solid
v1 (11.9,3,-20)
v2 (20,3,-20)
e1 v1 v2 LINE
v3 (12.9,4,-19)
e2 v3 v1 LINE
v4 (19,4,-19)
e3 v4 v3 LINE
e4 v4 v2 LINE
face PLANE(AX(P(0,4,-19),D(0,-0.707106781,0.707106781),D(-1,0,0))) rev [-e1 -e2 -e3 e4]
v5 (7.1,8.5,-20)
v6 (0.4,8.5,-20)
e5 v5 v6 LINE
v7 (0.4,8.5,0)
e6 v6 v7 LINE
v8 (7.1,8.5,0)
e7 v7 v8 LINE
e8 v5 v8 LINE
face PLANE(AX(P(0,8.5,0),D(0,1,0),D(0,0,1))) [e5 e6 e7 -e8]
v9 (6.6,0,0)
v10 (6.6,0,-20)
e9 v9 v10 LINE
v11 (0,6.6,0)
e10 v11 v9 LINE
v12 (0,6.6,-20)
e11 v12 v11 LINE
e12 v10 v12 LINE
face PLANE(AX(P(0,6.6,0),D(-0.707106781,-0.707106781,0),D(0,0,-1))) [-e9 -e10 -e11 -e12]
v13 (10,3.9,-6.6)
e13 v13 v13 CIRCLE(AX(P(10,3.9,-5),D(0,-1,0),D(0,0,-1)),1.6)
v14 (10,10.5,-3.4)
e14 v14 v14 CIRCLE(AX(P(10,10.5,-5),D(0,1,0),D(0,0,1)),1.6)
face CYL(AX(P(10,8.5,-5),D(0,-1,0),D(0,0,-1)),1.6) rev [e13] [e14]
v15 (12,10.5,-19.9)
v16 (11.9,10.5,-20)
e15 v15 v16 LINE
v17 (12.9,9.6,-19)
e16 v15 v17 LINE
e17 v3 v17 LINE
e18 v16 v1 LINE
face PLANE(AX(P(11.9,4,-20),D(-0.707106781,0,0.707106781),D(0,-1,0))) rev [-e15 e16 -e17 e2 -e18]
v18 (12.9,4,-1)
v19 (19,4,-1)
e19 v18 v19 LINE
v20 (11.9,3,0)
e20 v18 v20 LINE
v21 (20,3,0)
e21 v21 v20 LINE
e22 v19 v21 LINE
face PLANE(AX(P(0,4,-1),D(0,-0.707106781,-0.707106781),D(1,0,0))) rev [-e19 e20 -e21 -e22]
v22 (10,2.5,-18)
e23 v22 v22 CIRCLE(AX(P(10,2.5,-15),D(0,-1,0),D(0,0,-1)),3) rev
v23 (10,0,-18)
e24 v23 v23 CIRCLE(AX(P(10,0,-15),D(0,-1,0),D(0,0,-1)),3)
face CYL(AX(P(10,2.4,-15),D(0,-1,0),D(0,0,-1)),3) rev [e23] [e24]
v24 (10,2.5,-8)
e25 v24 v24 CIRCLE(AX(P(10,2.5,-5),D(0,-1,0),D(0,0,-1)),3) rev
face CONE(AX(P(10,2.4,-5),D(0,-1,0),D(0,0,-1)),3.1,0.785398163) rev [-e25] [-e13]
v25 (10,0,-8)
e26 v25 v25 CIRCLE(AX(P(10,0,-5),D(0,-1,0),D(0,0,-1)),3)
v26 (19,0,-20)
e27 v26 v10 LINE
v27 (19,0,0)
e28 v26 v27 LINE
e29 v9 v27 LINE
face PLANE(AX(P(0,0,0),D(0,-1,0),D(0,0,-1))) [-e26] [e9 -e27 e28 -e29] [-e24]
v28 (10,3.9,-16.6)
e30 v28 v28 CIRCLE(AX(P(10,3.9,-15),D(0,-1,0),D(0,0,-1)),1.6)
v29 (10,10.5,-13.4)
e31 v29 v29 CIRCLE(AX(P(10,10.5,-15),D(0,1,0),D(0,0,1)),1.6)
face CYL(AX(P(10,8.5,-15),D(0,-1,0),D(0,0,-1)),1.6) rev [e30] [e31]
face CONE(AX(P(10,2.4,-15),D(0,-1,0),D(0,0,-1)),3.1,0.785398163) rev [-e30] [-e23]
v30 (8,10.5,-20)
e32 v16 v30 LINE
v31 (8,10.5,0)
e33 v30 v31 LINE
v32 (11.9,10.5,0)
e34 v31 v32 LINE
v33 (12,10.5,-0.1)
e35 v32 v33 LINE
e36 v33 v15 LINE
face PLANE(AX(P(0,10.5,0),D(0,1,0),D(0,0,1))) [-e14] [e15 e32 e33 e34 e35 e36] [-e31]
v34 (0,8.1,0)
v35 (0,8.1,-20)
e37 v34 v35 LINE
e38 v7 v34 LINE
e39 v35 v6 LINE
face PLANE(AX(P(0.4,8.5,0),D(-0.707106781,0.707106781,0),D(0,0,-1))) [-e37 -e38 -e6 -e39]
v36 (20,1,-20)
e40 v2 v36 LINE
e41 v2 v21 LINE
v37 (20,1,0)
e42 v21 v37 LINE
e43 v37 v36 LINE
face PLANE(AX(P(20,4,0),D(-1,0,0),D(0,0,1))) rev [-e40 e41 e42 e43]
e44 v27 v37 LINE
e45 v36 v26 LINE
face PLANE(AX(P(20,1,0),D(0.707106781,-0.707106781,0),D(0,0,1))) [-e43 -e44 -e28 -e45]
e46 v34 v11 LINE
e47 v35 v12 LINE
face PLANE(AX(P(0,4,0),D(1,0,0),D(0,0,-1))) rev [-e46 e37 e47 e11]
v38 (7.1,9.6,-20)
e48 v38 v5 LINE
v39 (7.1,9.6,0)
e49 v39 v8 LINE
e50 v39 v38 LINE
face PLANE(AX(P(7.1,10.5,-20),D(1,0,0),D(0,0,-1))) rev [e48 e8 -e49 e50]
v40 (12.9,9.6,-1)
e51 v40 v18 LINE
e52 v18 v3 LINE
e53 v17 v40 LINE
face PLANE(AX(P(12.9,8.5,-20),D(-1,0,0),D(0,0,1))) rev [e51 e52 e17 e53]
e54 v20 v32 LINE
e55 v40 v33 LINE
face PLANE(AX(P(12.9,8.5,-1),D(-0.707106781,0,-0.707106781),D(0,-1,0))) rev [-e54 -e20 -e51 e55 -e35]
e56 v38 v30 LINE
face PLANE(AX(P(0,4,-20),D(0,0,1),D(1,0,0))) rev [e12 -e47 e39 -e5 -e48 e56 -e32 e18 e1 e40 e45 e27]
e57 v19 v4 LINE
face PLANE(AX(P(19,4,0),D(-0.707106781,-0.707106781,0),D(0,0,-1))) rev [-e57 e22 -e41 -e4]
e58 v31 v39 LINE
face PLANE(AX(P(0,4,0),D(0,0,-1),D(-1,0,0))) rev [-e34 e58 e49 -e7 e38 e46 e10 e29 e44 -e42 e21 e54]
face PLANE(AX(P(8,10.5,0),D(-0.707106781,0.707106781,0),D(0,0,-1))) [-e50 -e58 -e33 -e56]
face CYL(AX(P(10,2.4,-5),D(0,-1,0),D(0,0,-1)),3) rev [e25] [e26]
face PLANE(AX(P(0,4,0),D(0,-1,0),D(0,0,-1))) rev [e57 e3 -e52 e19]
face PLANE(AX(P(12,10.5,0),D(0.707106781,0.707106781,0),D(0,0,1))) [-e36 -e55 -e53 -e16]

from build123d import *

# Parameters (mm, degrees)
SKETCH_1_W          = 20
SKETCH_1_H          = 20
EXTRUDE_1_DEPTH     = 4
SKETCH_2_W          = 12.9
SKETCH_2_H          = 20
EXTRUDE_2_DEPTH     = 4.5
SKETCH_3_R          = 1.6
CUT_EXTRUDE_1_DEPTH = 30.533878851
SKETCH_4_W          = 5.8
SKETCH_4_H          = 20
SKETCH_4_R          = 1.6
EXTRUDE_3_DEPTH     = 2
SKETCH_5_R          = 3
CUT_EXTRUDE_3_DEPTH = 2.4
CHAMFER_3_SIZE      = 1.5
CHAMFER_1_SIZE      = 6.6
CHAMFER_2_SIZE      = 1
CHAMFER_4_SIZE      = 0.4
CHAMFER_5_SIZE      = 0.9


with BuildPart() as part:
    # 草图1 → 凸台-拉伸1 (new body)
    with BuildSketch(Plane(origin=(0, 0, 0), x_dir=(1, 0, 0), z_dir=(0, 1, 0))):
        with Locations((10, 10)):
            Rectangle(SKETCH_1_W, SKETCH_1_H)
    extrude(amount=EXTRUDE_1_DEPTH)

    # 草图2 → 凸台-拉伸2 (add)
    with BuildSketch(Plane(origin=(0, 4, 0), x_dir=(1, 0, 0), z_dir=(0, 1, 0))):
        with Locations((6.45, 10)):
            Rectangle(SKETCH_2_W, SKETCH_2_H)
    extrude(amount=EXTRUDE_2_DEPTH)

    # 草图3 → 切除-拉伸1 (cut, through all)
    with BuildSketch(Plane(origin=(0, 0, 0), x_dir=(-1, 0, 0), z_dir=(0, -1, 0))):
        with Locations(Location((-10, 5, 0), (0, 0, 90))):
            Circle(SKETCH_3_R)
        with Locations(Location((-10, 15, 0), (0, 0, 90))):
            Circle(SKETCH_3_R)
    extrude(amount=-CUT_EXTRUDE_1_DEPTH, mode=Mode.SUBTRACT)

    # 草图4 → 凸台-拉伸3 (add)
    with BuildSketch(Plane(origin=(0, 8.5, 0), x_dir=(1, 0, 0), z_dir=(0, 1, 0))):
        with Locations((10, 10)):
            Rectangle(SKETCH_4_W, SKETCH_4_H)
        with Locations(Location((10, 15, 0), (0, 0, 90))):
            Circle(SKETCH_4_R, mode=Mode.SUBTRACT)
        with Locations(Location((10, 5, 0), (0, 0, 90))):
            Circle(SKETCH_4_R, mode=Mode.SUBTRACT)
    extrude(amount=EXTRUDE_3_DEPTH)

    # 草图5 → 切除-拉伸3 (cut)
    with BuildSketch(Plane(origin=(0, 0, 0), x_dir=(-1, 0, 0), z_dir=(0, -1, 0))):
        with Locations(Location((-10, 5, 0), (0, 0, 90))):
            Circle(SKETCH_5_R)
        with Locations(Location((-10, 15, 0), (0, 0, 90))):
            Circle(SKETCH_5_R)
    extrude(amount=-CUT_EXTRUDE_3_DEPTH, mode=Mode.SUBTRACT)

    # 倒角3
    # the kernel refuses this chamfer: 1.5 mm, written as the material it takes off along each edge
    with BuildSketch(Plane(origin=(10, 2.4, -15), x_dir=(0, 0, -1), z_dir=(-1, 0, 0))) as chamfer_3_piece_1_section:
        Polygon((1.6 + CHAMFER_3_SIZE, 0), (1.6, -CHAMFER_3_SIZE), (1.6, 0), align=None)
    chamfer_3_piece_1 = revolve(axis=Axis((10, 2.4, -15), (0, -1, 0)), mode=Mode.PRIVATE)
    chamfer_3_piece_1 = chamfer_3_piece_1 & Plane(origin=(10, 3.20338318, -15), x_dir=(0, 0, -1), z_dir=(0, -1, 0)) * Cylinder(3, 13, mode=Mode.PRIVATE)
    add(chamfer_3_piece_1, mode=Mode.SUBTRACT)
    with BuildSketch(Plane(origin=(10, 2.4, -5), x_dir=(0, 0, -1), z_dir=(-1, 0, 0))) as chamfer_3_piece_2_section:
        Polygon((1.6 + CHAMFER_3_SIZE, 0), (1.6, -CHAMFER_3_SIZE), (1.6, 0), align=None)
    chamfer_3_piece_2 = revolve(axis=Axis((10, 2.4, -5), (0, -1, 0)), mode=Mode.PRIVATE)
    chamfer_3_piece_2 = chamfer_3_piece_2 & Plane(origin=(10, 3.20338318, -5), x_dir=(0, 0, -1), z_dir=(0, -1, 0)) * Cylinder(3, 13, mode=Mode.PRIVATE)
    add(chamfer_3_piece_2, mode=Mode.SUBTRACT)

    # 倒角1
    chamfer_1_edges = [part.edges().sort_by_distance(p)[0] for p in [
        (0, 0, -10),
    ]]
    chamfer(chamfer_1_edges, length=CHAMFER_1_SIZE)

    # 倒角2
    chamfer_2_edges = [part.edges().sort_by_distance(p)[0] for p in [
        (20, 4, -10),
        (16.45, 4, 0),
        (12.9, 7.25, 0),
        (12.9, 7.25, -20),
        (16.45, 4, -20),
        (20, 0, -10),
    ]]
    chamfer(chamfer_2_edges, length=CHAMFER_2_SIZE)

    # 倒角4
    chamfer_4_edges = [part.edges().sort_by_distance(p)[0] for p in [
        (0, 8.5, -10),
    ]]
    chamfer(chamfer_4_edges, length=CHAMFER_4_SIZE)

    # 倒角5
    chamfer_5_edges = [part.edges().sort_by_distance(p)[0] for p in [
        (7.1, 10.5, -10),
        (12.9, 10.5, -10),
    ]]
    chamfer(chamfer_5_edges, length=CHAMFER_5_SIZE)


solid = part.part
